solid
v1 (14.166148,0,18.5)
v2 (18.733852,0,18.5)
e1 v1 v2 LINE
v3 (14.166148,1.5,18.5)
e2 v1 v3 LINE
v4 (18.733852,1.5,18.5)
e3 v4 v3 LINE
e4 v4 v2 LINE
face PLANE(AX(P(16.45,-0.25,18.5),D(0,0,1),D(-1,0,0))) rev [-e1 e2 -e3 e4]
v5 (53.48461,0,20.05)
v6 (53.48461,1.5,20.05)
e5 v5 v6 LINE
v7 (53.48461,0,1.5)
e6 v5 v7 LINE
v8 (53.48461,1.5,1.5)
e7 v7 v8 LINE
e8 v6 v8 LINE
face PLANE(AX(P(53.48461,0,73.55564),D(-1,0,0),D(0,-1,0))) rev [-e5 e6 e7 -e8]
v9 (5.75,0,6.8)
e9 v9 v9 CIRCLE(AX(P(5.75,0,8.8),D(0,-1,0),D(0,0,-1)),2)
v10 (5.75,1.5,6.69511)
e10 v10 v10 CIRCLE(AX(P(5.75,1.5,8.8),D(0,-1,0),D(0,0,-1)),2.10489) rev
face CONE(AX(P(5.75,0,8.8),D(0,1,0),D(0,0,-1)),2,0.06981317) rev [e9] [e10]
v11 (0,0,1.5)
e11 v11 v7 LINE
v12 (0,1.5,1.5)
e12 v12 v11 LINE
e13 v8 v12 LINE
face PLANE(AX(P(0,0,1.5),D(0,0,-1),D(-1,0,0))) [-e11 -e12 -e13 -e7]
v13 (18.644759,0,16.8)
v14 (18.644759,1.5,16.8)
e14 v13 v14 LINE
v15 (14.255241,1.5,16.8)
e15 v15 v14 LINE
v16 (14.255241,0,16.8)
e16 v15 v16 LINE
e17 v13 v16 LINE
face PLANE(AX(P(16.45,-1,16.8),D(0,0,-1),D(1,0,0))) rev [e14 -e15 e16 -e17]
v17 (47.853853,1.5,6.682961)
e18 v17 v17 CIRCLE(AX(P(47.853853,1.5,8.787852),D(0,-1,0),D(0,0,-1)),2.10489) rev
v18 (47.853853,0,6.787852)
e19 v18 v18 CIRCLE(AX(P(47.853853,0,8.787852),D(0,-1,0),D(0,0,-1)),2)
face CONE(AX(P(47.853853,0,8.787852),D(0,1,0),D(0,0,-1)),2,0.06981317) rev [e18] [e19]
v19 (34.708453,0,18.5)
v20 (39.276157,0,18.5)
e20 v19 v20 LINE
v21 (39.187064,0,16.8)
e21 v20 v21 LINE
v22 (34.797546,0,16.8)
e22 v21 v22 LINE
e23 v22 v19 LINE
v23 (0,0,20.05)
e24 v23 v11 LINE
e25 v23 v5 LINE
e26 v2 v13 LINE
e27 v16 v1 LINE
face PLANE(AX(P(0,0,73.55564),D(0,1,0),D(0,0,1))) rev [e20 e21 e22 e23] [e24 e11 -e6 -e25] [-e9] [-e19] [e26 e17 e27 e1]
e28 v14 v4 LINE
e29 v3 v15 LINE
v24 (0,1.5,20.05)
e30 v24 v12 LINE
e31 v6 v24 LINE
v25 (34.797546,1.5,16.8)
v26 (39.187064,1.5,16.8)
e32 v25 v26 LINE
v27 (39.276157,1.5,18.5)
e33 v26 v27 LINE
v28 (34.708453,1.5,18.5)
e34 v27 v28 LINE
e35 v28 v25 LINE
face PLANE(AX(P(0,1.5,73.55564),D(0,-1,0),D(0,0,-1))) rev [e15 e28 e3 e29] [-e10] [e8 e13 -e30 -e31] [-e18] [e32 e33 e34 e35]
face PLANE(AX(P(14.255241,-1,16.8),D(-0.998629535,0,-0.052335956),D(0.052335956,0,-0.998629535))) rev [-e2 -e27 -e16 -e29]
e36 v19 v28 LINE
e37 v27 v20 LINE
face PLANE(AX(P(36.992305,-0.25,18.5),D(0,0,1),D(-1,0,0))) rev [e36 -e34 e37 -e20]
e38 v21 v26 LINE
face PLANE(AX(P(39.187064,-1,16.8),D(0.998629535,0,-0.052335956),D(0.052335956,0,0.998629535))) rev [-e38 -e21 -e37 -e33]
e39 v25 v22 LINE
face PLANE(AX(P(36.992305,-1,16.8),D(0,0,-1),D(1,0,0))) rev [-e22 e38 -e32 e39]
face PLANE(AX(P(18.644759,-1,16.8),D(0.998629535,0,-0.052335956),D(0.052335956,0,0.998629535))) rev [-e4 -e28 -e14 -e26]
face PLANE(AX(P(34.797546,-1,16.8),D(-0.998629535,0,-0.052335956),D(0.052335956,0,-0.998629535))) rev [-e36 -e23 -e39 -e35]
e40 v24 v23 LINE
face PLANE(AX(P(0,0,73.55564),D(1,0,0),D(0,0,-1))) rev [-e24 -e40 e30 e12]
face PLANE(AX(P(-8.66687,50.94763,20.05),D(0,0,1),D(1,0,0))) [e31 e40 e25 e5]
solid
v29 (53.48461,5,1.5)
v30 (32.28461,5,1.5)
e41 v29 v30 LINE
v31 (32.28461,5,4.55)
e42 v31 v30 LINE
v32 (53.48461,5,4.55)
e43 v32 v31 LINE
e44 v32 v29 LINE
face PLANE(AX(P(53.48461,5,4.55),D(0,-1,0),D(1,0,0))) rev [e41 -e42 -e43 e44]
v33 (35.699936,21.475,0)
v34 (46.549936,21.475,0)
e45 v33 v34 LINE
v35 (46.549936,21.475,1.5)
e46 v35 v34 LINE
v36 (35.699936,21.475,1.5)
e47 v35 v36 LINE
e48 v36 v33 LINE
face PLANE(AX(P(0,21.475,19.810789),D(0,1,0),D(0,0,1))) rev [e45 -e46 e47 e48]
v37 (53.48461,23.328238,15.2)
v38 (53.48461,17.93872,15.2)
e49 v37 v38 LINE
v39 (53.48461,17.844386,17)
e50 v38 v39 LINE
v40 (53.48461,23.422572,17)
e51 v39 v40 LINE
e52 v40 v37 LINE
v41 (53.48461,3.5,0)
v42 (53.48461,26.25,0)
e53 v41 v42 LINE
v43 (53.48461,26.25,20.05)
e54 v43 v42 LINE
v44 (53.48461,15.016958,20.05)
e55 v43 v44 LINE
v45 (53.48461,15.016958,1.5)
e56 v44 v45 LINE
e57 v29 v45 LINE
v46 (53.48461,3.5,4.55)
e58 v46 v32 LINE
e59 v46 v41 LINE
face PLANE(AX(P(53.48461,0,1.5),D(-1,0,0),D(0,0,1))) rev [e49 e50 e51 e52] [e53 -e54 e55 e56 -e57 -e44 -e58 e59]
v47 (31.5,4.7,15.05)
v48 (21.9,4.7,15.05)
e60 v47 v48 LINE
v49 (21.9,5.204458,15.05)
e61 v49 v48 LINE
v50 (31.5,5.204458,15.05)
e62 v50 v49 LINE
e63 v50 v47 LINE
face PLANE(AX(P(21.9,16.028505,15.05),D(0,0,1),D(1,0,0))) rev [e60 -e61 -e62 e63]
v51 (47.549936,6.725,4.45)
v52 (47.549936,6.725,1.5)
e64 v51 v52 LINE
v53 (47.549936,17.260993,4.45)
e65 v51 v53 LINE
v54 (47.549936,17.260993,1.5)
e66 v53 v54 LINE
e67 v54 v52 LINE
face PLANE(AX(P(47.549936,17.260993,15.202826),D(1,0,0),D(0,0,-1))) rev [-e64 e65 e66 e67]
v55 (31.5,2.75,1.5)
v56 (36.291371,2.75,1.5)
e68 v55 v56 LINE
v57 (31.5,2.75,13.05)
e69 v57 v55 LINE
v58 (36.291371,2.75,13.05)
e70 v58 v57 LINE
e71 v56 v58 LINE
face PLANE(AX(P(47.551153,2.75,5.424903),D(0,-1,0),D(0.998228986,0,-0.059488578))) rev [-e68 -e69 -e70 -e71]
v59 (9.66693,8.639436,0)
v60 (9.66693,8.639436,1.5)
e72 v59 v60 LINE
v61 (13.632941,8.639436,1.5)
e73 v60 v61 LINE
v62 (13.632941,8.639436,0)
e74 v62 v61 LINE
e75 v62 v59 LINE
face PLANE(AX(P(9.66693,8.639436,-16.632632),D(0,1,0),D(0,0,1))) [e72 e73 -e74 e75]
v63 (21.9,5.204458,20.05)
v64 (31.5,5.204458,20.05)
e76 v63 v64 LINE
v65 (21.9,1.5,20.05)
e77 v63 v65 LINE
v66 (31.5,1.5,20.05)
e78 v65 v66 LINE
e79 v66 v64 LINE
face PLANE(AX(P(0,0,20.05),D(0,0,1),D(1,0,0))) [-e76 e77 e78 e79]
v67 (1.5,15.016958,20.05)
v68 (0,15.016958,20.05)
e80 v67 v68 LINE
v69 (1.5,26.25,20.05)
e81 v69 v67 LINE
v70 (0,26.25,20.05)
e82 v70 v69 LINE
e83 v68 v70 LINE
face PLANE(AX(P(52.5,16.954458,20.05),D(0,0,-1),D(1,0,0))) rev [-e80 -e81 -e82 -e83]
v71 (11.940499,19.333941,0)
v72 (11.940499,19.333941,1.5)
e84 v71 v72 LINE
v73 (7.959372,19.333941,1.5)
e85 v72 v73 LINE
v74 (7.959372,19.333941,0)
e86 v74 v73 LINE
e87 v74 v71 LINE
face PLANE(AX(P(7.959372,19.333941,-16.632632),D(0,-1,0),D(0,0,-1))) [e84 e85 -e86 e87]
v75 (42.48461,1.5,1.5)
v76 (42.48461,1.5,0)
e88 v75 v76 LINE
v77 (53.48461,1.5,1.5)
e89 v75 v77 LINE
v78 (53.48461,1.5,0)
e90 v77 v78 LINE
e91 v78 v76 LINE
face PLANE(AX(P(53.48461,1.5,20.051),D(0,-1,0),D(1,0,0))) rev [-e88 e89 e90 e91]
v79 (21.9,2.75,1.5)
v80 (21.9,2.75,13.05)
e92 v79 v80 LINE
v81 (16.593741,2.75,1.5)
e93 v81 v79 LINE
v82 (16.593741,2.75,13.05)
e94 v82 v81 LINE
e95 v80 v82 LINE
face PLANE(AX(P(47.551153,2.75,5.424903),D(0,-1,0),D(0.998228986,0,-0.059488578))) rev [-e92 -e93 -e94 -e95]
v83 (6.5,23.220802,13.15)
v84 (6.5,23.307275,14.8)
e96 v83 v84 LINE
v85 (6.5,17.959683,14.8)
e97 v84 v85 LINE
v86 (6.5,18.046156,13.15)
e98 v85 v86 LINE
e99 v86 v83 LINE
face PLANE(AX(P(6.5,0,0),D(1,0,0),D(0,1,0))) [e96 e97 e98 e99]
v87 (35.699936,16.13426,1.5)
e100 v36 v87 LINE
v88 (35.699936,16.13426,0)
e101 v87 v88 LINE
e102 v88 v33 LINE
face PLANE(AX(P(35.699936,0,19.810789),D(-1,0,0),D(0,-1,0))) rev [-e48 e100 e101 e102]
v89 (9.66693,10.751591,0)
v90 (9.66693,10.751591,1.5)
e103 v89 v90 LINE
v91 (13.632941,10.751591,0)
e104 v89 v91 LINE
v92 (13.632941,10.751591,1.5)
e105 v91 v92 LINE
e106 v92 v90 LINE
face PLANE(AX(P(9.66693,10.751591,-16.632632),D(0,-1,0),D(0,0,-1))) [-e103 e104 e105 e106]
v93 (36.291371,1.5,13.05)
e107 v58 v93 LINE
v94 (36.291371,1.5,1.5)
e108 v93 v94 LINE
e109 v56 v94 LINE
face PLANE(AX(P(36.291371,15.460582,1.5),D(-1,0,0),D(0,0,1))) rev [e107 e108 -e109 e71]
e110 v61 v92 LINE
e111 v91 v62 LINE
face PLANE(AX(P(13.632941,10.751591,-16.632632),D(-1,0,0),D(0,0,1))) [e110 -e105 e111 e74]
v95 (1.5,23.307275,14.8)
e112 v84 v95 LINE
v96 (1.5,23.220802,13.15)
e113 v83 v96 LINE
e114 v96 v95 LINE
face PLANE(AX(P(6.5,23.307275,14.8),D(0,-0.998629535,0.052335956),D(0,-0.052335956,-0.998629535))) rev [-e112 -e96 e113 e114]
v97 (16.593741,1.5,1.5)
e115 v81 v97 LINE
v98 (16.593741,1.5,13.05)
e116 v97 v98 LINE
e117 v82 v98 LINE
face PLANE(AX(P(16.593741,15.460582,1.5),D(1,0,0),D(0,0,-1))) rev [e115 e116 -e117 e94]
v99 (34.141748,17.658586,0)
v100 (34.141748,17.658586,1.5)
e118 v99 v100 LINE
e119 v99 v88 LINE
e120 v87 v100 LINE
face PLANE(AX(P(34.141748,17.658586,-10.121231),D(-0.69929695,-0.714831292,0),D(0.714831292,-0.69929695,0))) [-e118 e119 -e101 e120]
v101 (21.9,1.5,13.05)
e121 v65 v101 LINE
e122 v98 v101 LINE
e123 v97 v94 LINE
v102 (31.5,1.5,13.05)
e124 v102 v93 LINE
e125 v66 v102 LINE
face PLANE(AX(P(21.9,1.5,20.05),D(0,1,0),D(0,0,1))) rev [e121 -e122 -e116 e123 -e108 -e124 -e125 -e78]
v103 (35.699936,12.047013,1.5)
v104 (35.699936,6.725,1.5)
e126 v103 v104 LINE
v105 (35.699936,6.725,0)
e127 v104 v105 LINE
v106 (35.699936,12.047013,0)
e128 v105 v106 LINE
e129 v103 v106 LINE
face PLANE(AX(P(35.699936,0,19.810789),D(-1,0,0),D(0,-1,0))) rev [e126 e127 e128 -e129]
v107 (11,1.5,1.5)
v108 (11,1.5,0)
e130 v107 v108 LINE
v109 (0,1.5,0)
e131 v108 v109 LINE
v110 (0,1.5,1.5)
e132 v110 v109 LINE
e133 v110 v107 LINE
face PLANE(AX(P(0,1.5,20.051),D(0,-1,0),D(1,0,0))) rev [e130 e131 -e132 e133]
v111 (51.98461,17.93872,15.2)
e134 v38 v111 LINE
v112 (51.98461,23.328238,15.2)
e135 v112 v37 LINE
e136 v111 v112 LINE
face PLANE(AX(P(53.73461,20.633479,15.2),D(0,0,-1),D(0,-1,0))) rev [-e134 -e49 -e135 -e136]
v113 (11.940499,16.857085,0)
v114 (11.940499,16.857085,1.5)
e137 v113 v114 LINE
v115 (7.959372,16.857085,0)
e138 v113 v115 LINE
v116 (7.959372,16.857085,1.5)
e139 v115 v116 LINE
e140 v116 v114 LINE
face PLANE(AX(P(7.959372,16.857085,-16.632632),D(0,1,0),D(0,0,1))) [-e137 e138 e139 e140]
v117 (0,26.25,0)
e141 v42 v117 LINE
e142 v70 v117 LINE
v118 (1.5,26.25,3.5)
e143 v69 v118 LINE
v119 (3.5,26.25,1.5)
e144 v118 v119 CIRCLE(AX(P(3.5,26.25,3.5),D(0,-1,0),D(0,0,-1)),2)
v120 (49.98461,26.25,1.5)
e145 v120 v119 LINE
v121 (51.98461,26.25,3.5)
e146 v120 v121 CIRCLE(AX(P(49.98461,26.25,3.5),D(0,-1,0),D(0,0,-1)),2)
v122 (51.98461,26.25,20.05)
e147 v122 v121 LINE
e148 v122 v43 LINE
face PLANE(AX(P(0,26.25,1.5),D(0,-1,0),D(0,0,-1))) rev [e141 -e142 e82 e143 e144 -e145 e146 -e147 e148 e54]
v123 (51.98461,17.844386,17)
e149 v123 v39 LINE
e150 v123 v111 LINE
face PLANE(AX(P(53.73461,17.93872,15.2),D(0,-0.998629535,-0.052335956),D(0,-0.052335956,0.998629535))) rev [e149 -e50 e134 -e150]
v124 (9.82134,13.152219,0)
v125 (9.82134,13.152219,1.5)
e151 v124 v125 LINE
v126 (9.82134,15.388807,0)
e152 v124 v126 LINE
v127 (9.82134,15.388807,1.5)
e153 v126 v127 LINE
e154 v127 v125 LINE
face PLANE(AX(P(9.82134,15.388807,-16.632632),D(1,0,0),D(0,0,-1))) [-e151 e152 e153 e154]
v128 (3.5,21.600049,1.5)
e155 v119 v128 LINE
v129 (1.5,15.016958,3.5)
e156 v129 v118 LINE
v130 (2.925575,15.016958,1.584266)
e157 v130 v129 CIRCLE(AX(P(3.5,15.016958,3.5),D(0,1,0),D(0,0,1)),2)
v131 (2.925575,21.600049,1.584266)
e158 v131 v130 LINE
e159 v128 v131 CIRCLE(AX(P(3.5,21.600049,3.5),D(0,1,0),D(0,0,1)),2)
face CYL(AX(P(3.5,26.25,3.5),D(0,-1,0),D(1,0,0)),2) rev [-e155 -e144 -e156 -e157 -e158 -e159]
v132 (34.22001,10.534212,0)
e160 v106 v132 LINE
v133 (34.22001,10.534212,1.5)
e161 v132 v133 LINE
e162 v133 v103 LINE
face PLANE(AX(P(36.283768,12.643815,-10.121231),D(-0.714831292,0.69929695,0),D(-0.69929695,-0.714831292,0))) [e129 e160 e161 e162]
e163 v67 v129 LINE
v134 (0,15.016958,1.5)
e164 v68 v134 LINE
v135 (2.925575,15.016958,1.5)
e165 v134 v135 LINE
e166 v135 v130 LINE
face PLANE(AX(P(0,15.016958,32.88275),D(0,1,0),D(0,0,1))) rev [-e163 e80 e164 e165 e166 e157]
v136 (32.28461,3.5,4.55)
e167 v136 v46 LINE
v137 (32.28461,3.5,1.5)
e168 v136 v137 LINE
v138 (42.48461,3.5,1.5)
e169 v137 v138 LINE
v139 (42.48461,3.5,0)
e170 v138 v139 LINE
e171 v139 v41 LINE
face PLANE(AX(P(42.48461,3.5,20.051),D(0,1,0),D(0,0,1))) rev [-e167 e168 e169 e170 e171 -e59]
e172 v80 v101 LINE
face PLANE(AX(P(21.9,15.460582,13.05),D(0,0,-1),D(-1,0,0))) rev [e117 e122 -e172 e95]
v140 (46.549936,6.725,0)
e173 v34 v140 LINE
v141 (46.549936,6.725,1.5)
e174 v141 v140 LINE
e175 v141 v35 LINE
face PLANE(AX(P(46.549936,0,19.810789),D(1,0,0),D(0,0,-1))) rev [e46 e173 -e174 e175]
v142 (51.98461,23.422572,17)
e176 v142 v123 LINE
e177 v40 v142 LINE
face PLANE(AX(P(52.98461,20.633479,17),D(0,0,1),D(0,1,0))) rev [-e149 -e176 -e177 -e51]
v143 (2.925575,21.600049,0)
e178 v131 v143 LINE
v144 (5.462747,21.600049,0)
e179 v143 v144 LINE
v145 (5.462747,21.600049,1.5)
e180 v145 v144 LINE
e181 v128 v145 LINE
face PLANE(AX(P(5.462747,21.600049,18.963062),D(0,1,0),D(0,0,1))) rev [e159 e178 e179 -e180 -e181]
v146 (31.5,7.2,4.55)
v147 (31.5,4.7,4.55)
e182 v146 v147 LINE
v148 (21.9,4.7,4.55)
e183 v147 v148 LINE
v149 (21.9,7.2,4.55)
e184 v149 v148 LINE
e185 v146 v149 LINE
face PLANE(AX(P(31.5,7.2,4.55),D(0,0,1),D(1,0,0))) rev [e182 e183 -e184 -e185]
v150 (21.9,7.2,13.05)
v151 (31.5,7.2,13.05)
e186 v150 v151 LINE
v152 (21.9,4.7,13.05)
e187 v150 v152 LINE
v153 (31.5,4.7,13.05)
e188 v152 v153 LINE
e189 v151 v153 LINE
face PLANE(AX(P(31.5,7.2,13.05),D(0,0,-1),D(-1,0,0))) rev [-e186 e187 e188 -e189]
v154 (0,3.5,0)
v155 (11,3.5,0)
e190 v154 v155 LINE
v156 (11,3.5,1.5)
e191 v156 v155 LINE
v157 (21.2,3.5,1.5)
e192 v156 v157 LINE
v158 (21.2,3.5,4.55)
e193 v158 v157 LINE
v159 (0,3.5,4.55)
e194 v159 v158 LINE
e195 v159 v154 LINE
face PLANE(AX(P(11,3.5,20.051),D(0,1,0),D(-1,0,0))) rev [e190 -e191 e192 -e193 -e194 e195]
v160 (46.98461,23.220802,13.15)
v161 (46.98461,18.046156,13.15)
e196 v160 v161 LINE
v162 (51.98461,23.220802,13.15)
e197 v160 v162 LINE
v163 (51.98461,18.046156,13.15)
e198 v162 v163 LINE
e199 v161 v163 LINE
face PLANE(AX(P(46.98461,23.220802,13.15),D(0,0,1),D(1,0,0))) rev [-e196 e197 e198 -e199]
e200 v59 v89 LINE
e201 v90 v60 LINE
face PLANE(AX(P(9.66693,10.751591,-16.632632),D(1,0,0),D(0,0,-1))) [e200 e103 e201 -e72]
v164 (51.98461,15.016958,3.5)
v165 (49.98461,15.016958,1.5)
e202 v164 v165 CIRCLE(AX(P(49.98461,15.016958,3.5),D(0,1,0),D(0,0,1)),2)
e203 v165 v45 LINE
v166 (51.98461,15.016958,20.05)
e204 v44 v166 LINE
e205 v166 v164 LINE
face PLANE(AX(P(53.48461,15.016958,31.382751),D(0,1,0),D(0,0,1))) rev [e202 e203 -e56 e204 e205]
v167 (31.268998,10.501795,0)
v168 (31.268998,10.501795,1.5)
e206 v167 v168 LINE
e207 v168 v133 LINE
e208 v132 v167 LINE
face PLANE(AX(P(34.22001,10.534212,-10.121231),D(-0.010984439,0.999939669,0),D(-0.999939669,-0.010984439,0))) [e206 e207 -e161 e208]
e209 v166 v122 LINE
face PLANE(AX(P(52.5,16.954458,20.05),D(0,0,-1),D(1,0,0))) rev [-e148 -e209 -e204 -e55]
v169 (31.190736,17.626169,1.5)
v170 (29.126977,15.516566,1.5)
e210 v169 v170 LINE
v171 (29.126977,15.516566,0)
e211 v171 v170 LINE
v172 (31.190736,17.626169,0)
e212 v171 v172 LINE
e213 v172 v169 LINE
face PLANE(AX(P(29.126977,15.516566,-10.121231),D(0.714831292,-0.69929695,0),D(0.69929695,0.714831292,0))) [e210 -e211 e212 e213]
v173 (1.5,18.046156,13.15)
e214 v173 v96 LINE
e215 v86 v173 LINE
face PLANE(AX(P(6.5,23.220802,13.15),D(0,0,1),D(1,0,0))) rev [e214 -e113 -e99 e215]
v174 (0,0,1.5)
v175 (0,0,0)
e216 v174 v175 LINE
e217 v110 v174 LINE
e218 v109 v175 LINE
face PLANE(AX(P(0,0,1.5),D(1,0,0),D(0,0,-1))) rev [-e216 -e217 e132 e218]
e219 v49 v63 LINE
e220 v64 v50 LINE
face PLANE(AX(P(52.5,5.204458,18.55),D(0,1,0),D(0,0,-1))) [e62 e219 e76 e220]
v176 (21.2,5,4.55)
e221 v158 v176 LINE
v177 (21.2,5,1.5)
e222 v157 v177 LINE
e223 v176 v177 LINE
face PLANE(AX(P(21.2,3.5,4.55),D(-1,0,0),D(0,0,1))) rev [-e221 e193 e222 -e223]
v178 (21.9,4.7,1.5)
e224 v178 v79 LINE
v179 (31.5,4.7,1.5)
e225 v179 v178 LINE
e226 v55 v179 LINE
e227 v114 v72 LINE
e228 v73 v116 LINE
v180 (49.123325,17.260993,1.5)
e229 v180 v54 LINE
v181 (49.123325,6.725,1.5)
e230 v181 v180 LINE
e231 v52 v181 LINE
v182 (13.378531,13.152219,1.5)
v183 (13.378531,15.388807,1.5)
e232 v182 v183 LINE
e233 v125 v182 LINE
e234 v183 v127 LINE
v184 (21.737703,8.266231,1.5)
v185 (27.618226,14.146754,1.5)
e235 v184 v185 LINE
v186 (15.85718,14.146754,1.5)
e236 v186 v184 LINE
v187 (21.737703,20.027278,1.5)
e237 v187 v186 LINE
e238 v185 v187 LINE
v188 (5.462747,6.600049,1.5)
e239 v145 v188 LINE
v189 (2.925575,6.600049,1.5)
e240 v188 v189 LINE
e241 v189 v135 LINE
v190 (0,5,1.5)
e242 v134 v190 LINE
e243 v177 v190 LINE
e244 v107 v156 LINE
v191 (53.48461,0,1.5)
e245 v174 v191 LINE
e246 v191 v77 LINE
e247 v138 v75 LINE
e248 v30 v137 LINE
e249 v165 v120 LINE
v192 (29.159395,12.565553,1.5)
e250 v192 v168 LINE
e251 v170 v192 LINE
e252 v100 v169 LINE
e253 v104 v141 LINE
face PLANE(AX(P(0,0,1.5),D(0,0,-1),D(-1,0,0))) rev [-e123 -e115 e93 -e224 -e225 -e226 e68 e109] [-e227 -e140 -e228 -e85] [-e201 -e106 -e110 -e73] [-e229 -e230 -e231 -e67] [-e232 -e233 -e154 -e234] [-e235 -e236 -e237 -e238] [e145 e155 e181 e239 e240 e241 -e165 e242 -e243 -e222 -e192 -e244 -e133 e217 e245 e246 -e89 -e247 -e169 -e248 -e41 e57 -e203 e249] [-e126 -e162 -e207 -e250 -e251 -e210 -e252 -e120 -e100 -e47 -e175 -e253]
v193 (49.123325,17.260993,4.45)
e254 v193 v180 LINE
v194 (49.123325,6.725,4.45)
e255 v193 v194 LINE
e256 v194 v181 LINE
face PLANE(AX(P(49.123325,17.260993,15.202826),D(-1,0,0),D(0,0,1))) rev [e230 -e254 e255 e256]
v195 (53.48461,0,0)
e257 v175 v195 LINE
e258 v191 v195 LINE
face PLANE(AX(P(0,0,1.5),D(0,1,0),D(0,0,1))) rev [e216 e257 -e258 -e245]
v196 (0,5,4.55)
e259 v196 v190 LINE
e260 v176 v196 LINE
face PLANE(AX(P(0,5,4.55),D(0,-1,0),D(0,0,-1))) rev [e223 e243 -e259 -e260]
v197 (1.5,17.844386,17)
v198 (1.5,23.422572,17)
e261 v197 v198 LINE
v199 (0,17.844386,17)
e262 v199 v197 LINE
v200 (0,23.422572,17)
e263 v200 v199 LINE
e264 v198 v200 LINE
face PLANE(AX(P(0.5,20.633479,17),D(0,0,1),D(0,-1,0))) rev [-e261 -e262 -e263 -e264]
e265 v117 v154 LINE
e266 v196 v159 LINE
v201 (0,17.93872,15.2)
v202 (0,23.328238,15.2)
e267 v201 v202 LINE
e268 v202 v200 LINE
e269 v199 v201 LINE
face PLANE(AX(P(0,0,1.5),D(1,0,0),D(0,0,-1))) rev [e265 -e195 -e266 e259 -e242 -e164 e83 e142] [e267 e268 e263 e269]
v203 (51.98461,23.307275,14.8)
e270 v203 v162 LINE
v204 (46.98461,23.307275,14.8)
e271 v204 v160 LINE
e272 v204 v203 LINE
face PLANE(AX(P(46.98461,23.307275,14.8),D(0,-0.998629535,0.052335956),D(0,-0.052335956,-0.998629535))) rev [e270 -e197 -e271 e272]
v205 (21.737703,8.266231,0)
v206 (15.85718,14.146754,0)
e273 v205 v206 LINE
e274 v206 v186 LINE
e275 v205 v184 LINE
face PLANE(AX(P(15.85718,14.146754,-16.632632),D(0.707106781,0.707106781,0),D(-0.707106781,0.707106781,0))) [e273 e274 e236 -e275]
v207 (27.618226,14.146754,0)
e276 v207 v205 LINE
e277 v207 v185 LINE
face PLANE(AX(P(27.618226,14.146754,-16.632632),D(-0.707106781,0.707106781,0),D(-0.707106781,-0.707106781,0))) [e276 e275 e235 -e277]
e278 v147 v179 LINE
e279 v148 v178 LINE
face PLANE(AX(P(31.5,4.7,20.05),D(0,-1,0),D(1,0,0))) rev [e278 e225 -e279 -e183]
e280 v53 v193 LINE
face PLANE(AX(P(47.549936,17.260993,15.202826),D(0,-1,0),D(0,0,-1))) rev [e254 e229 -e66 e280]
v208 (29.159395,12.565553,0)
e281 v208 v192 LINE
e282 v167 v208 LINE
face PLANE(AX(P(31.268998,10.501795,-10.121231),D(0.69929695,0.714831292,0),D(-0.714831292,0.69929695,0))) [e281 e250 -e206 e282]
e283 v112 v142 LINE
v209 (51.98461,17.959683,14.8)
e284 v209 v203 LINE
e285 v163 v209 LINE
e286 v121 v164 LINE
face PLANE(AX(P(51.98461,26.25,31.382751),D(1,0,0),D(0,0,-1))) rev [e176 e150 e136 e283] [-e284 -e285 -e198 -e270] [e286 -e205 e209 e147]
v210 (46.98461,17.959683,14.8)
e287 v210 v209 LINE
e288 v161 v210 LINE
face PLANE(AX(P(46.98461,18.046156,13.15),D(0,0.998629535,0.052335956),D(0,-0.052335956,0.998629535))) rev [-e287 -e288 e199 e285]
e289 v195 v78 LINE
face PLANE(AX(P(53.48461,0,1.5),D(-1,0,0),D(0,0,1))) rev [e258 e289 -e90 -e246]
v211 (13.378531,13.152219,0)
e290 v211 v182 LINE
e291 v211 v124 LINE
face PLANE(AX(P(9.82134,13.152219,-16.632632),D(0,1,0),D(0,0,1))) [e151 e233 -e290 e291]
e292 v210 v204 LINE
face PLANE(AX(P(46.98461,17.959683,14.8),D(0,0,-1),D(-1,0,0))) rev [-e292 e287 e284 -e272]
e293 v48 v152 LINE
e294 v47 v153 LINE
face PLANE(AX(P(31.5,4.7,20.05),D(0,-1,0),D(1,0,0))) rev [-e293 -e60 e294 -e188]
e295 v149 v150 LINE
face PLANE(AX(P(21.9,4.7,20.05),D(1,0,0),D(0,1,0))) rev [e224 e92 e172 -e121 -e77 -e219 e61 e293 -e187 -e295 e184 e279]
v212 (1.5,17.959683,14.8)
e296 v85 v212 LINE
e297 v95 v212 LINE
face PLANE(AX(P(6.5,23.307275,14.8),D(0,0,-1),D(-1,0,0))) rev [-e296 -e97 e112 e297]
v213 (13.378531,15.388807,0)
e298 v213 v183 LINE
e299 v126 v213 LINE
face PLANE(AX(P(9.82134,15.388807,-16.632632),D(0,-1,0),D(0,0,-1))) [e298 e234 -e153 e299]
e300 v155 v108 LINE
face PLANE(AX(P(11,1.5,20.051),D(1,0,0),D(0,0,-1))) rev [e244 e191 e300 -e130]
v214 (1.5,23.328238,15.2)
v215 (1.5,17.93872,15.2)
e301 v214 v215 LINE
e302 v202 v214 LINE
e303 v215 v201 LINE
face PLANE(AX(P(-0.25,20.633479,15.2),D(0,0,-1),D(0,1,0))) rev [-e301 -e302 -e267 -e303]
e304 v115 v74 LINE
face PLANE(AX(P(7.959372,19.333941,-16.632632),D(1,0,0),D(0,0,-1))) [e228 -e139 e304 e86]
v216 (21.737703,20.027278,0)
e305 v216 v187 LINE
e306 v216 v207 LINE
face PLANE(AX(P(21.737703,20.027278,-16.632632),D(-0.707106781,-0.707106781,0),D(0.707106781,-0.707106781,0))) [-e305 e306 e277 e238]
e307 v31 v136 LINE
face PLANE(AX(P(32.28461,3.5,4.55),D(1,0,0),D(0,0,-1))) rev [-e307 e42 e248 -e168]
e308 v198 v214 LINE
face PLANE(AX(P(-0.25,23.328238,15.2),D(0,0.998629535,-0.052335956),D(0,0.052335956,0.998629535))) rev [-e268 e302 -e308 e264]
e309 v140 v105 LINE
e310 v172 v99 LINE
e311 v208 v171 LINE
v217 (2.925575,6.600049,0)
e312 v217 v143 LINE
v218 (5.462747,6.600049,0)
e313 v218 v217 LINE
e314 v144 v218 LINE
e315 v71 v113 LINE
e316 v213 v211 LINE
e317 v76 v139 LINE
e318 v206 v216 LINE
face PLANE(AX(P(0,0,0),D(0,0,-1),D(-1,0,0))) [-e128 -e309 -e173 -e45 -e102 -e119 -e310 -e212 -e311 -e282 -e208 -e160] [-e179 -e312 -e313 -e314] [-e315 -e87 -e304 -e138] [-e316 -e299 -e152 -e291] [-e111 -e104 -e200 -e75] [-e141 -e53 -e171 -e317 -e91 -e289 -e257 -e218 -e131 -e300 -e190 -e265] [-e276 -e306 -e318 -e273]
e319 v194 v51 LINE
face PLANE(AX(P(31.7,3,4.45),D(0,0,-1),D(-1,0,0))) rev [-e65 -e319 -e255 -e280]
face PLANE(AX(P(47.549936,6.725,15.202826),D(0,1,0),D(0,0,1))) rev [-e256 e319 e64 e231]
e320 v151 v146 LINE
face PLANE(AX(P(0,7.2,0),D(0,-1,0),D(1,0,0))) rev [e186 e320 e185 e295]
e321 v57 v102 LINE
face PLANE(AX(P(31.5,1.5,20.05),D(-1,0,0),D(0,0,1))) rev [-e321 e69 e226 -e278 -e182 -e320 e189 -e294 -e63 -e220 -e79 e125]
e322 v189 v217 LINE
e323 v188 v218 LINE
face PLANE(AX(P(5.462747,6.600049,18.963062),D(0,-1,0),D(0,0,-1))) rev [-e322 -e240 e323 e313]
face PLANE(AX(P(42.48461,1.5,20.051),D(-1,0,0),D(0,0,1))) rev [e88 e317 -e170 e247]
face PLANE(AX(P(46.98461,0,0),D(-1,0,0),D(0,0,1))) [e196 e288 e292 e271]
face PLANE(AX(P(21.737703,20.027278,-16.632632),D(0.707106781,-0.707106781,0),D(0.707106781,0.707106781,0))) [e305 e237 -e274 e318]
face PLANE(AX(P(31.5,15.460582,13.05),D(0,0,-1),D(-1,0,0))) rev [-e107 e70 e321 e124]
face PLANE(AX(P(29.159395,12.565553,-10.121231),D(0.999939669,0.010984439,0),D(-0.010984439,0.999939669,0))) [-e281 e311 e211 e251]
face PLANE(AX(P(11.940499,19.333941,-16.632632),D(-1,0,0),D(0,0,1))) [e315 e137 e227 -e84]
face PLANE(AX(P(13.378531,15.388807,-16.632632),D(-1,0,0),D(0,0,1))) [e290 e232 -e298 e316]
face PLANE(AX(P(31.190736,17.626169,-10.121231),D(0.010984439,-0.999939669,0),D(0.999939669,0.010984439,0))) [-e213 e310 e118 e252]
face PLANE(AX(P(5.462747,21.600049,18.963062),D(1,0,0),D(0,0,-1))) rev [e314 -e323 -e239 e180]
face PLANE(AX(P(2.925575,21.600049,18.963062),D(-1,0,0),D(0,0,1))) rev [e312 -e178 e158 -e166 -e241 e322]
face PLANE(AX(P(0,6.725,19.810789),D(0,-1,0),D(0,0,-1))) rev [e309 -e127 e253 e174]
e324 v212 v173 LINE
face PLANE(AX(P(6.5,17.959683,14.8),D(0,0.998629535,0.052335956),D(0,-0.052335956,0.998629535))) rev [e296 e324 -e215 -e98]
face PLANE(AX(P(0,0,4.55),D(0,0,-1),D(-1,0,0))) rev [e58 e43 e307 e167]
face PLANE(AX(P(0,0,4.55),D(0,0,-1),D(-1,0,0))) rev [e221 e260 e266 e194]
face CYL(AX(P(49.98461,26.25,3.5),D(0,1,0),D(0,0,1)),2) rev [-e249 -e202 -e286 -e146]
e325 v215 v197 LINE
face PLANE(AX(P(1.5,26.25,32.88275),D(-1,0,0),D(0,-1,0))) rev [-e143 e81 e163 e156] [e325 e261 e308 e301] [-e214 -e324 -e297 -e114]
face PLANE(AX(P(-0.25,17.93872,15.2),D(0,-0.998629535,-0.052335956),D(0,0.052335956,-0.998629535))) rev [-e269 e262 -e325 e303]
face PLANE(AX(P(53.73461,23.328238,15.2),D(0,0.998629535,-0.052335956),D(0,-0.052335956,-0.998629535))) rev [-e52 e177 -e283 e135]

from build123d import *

# Parameters (mm, degrees)
SKETCH1_W                              = 53.48460998
SKETCH1_H                              = 26.25
FRONT_SIDE_MAIN_DEPTH                  = 1.5
RESET_HOLE_DEPTH                       = 3.75
SKETCH15_W                             = 3.966010581
SKETCH15_H                             = 2.112155191
SKETCH15_W_2                           = 3.557190409
SKETCH15_H_2                           = 2.236587576
SKETCH15_W_3                           = 3.981127105
SKETCH15_H_3                           = 2.476855865
COMPONENT_HOLES_DEPTH                  = 3.75
SKETCH16_W                             = 10.85
SKETCH16_H                             = 14.75
MICROPHONE_HOLE_DEPTH                  = 1.5
SKETCH24_W                             = 1.5
SKETCH24_H                             = 11.233042059
RIGHT_SIDE_TOP_DEPTH                   = 18.55
SNAP_GROOVE_RIGHT_DEPTH                = 1.5
SKETCH26_W                             = 1.5
SKETCH26_H                             = 11.233042059
LEFT_SIDE_TOP_DEPTH                    = 18.55
SNAP_START                             = 51.98460998
SNAP_GROOVE_LEFT_DEPTH                 = 1.5
SKETCH20_W                             = 53.48460998
SKETCH20_H                             = 1.5
BOTTOM_BASE_DEPTH                      = 18.55
SERVO_START                            = -1.5
SKETCH18_W                             = 9.6
SKETCH18_H                             = 3.2
SERVO_SEPERATOR_BOTTOM_DEPTH           = 20.05
SKETCH34_W                             = 2.537171882
SKETCH34_H                             = 15
PROGRAMMING_HOLE_DEPTH                 = 3.75
SKETCH38_W                             = 9.6
SKETCH38_H                             = 5
BACK_BATTERY_HOLDER_BOTTOM_DEPTH       = 0.504457941
SKETCH40_R                             = 2
SERVO_ARM_HOLES_BOTTOM_DEPTH           = 1.5
SERVO_ARM_HOLES_BOTTOM_DRAFT           = 4
SERVO_ARM_HOLES_BOTTOM_PROFILE_2_DEPTH = 1.5
SERVO_ARM_HOLES_BOTTOM_PROFILE_2_DRAFT = 4
SKETCH47_W                             = 11
SKETCH47_H                             = 2
SOLAR_ARM_HOLES_FRONT_DEPTH            = 1.5
FILLET1_R                              = 2
SKETCH48_W                             = 9.6
SKETCH48_H                             = 8.5
SERVO_TALLER_SEPERATOR_BOTTOM_DEPTH    = 2.5
SKETCH49_W                             = 1.573389805
SKETCH49_H                             = 10.535992885
SERVO_2_CASE_SPACER_FRONT_DEPTH        = 2.95
SKETCH51_W                             = 4.791370676
SKETCH51_H                             = 11.55
SKETCH51_W_2                           = 5.306259021
SERVO_LIFTERS_BOTTOM_DEPTH             = 1.25
SKETCH52_W                             = 21.2
SKETCH52_H                             = 1.5
SERVO_UNDER_SUPPORT_DEPTH              = 3.05
SERVO_TOP_SUPPORT_RIGHT_DEPTH          = 5
SERVO_TOP_SUPPORT_LEFT_DEPTH           = 5
SNAP_GROOVE_BOTTOM_RIGHT_DEPTH         = 1.5
SNAP_GROOVE_BOTTOM_LEFT_DEPTH          = 1.5


# Read off the part's stored shape, not the designer's step: Snap Groove - Right, Snap Groove - Left, Snap Groove - Bottom Right, Snap Groove - Bottom Left
with BuildPart() as part:
    # Sketch1 → Front Side - Main (new body)
    with BuildSketch(Plane.XY):
        with Locations((26.74230499, 13.125)):
            Rectangle(SKETCH1_W, SKETCH1_H)
    extrude(amount=FRONT_SIDE_MAIN_DEPTH)

    # Reset Hole Sketch → Reset Hole (cut)
    with BuildSketch(Plane(origin=(0, 0, 3.75), x_dir=(-1, 0, 0), z_dir=(0, 0, -1))):
        Polygon((-31.190735744, 17.626168756), (-34.141748042, 17.658585925), (-36.251351249, 15.594827519), (-36.283768419, 12.643815222), (-34.220010013, 10.534212015), (-31.268997715, 10.501794845), (-29.159394508, 12.565553251), (-29.126977338, 15.516565548), align=None)
    extrude(amount=RESET_HOLE_DEPTH, mode=Mode.SUBTRACT)

    # Sketch15 → Component Holes (cut)
    with BuildSketch(Plane(origin=(0, 0, 3.75), x_dir=(-1, 0, 0), z_dir=(0, 0, -1))):
        Polygon((-21.737702993, 20.027277789), (-15.857179586, 14.146754382), (-21.737702993, 8.266230975), (-27.6182264, 14.146754382), align=None)
        with Locations((-11.649935563, 9.695513201)):
            Rectangle(SKETCH15_W, SKETCH15_H)
        with Locations((-11.599935563, 14.270513201)):
            Rectangle(SKETCH15_W_2, SKETCH15_H_2)
        with Locations((-9.949935563, 18.095513201)):
            Rectangle(SKETCH15_W_3, SKETCH15_H_3)
    extrude(amount=COMPONENT_HOLES_DEPTH, mode=Mode.SUBTRACT)

    # Sketch16 → Microphone Hole (cut)
    with BuildSketch(Plane(origin=(0, 0, 0), x_dir=(-1, 0, 0), z_dir=(0, 0, -1))):
        with Locations((-41.124935562, 14.1)):
            Rectangle(SKETCH16_W, SKETCH16_H)
    extrude(amount=-MICROPHONE_HOLE_DEPTH, mode=Mode.SUBTRACT)

    # Sketch24 → Right Side - Top (add)
    with BuildSketch(Plane.XY.offset(1.5)):
        with Locations((0.75, 20.633478971)):
            Rectangle(SKETCH24_W, SKETCH24_H)
    extrude(amount=RIGHT_SIDE_TOP_DEPTH)

    # Snap Groove - Right outline → Snap Groove - Right (cut)
    with BuildSketch(Plane.YZ):
        Polygon((17.938719749, 15.2), (23.328238193, 15.2), (23.422572195, 17), (17.844385746, 17), align=None)
    extrude(amount=SNAP_GROOVE_RIGHT_DEPTH, mode=Mode.SUBTRACT)

    # Sketch26 → Left Side - Top (add)
    with BuildSketch(Plane.XY.offset(1.5)):
        with Locations((52.73460998, 20.633478971)):
            Rectangle(SKETCH26_W, SKETCH26_H)
    extrude(amount=LEFT_SIDE_TOP_DEPTH)

    # Snap Groove - Left outline → Snap Groove - Left (cut)
    with BuildSketch(Plane.YZ.offset(SNAP_START)):
        Polygon((17.938719748, 15.2), (23.328238192, 15.2), (23.422572195, 17), (17.844385746, 17), align=None)
    extrude(amount=SNAP_GROOVE_LEFT_DEPTH, mode=Mode.SUBTRACT)

    # Sketch18 → Servo Seperator - Bottom (add)
    with BuildSketch(Plane.XY.offset(1.5).offset(SERVO_START)):
        with Locations((26.7, 3.1)):
            Rectangle(SKETCH18_W, SKETCH18_H)
    extrude(amount=SERVO_SEPERATOR_BOTTOM_DEPTH)

    # Sketch34 → Programming Hole (cut)
    with BuildSketch(Plane(origin=(0, 0, 0), x_dir=(-1, 0, 0), z_dir=(0, 0, -1))):
        with Locations((-4.194161079, 14.100049249)):
            Rectangle(SKETCH34_W, SKETCH34_H)
    extrude(amount=-PROGRAMMING_HOLE_DEPTH, mode=Mode.SUBTRACT)

    # Sketch38 → Back Battery Holder - Bottom (add)
    with BuildSketch(Plane(origin=(0, 4.7, 0), x_dir=(1, 0, 0), z_dir=(0, 1, 0))):
        with Locations((26.7, -17.55)):
            Rectangle(SKETCH38_W, SKETCH38_H)
    extrude(amount=BACK_BATTERY_HOLDER_BOTTOM_DEPTH)

    # Sketch47 → Solar Arm Holes - Front (cut)
    with BuildSketch(Plane(origin=(0, 0, 0), x_dir=(-1, 0, 0), z_dir=(0, 0, -1))):
        with Locations((-47.98460998, 2.5)):
            Rectangle(SKETCH47_W, SKETCH47_H)
        with Locations((-5.5, 2.5)):
            Rectangle(SKETCH47_W, SKETCH47_H)
    extrude(amount=-SOLAR_ARM_HOLES_FRONT_DEPTH, mode=Mode.SUBTRACT)

    # Fillet1
    # the kernel refuses this fillet: 2 mm, written as the material it adds along each edge
    with BuildSketch(Plane(origin=(1.5, 26.25, 1.5), x_dir=(1, 0, 0), z_dir=(0, -1, 0))) as fillet1_piece_1_section:
        with BuildLine():
            CenterArc((FILLET1_R, FILLET1_R), FILLET1_R, 180, 90)
            Line((0, FILLET1_R), (0, 0))
            Line((0, 0), (FILLET1_R, 0))
        make_face()
    fillet1_piece_1 = extrude(amount=11.233042059, mode=Mode.PRIVATE)
    fillet1_piece_1 = split(fillet1_piece_1, bisect_by=Plane(origin=(3.153594052, 21.600049249, 1.498546269), z_dir=(0, 1, 0)), keep=Keep.TOP, mode=Mode.PRIVATE)
    fillet1_piece_1 = split(fillet1_piece_1, bisect_by=Plane(origin=(2.925575138, 23.925024625, 1.498546269), z_dir=(1, 0, 0)), keep=Keep.TOP, mode=Mode.PRIVATE)
    add(fillet1_piece_1)
    with BuildSketch(Plane(origin=(1.5, 26.25, 1.5), x_dir=(1, 0, 0), z_dir=(0, -1, 0))) as fillet1_piece_2_section:
        with BuildLine():
            CenterArc((FILLET1_R, FILLET1_R), FILLET1_R, 180, 90)
            Line((0, FILLET1_R), (0, 0))
            Line((0, 0), (FILLET1_R, 0))
        make_face()
    fillet1_piece_2 = extrude(amount=11.233042059, mode=Mode.PRIVATE)
    fillet1_piece_2 = split(fillet1_piece_2, bisect_by=Plane(origin=(1.90508607, 21.600049249, 1.970835912), z_dir=(0, 1, 0)), keep=Keep.TOP, mode=Mode.PRIVATE)
    fillet1_piece_2 = split(fillet1_piece_2, bisect_by=Plane(origin=(2.925575138, 23.925024625, 1.970835912), z_dir=(-1, 0, 0)), keep=Keep.TOP, mode=Mode.PRIVATE)
    add(fillet1_piece_2)
    with BuildSketch(Plane(origin=(1.5, 26.25, 1.5), x_dir=(1, 0, 0), z_dir=(0, -1, 0))) as fillet1_piece_3_section:
        with BuildLine():
            CenterArc((FILLET1_R, FILLET1_R), FILLET1_R, 180, 90)
            Line((0, FILLET1_R), (0, 0))
            Line((0, 0), (FILLET1_R, 0))
        make_face()
    fillet1_piece_3 = extrude(amount=11.233042059, mode=Mode.PRIVATE)
    fillet1_piece_3 = split(fillet1_piece_3, bisect_by=Plane(origin=(1.90508607, 21.600049249, 1.970835912), z_dir=(0, -1, 0)), keep=Keep.TOP, mode=Mode.PRIVATE)
    fillet1_piece_3 = split(fillet1_piece_3, bisect_by=Plane(origin=(2.925575138, 18.308503595, 1.970835912), z_dir=(-1, 0, 0)), keep=Keep.TOP, mode=Mode.PRIVATE)
    add(fillet1_piece_3)
    with BuildSketch(Plane(origin=(51.98460998, 26.25, 1.5), x_dir=(-1, 0, 0), z_dir=(0, -1, 0))) as fillet1_piece_4:
        with BuildLine():
            CenterArc((FILLET1_R, -FILLET1_R), FILLET1_R, 90, 90)
            Line((0, -FILLET1_R), (0, 0))
            Line((0, 0), (FILLET1_R, 0))
        make_face()
    extrude(amount=11.233042059)

    # Sketch48 → Servo Taller Seperator - Bottom (add)
    with BuildSketch(Plane(origin=(0, 4.7, 0), x_dir=(1, 0, 0), z_dir=(0, 1, 0))):
        with Locations((26.7, -8.8)):
            Rectangle(SKETCH48_W, SKETCH48_H)
    extrude(amount=SERVO_TALLER_SEPERATOR_BOTTOM_DEPTH)

    # Sketch49 → Servo 2 Case Spacer - Front (add)
    with BuildSketch(Plane.XY.offset(1.5)):
        with Locations((48.336630465, 11.992996443)):
            Rectangle(SKETCH49_W, SKETCH49_H)
    extrude(amount=SERVO_2_CASE_SPACER_FRONT_DEPTH)

    # Sketch51 → Servo Lifters - Bottom (add)
    with BuildSketch(Plane(origin=(0, 1.5, 0), x_dir=(1, 0, 0), z_dir=(0, 1, 0))):
        with Locations((33.895685338, -7.275)):
            Rectangle(SKETCH51_W, SKETCH51_H)
        with Locations((19.24687049, -7.275)):
            Rectangle(SKETCH51_W_2, SKETCH51_H)
    extrude(amount=SERVO_LIFTERS_BOTTOM_DEPTH)

    # Sketch52 → Servo Under Support (add)
    with BuildSketch(Plane.XY.offset(1.5)):
        with Locations((10.6, 4.25)):
            Rectangle(SKETCH52_W, SKETCH52_H)
        with Locations((42.88460998, 4.25)):
            Rectangle(SKETCH52_W, SKETCH52_H)
    extrude(amount=SERVO_UNDER_SUPPORT_DEPTH)

    # Sketch53 → Servo Top Support - Right (add)
    with BuildSketch(Plane(origin=(1.5, 0, 0), x_dir=(0, 0, -1), z_dir=(1, 0, 0))):
        Polygon((-14.8, 23.307275081), (-13.15, 23.220802245), (-13.15, 18.046155696), (-14.8, 17.95968286), align=None)
    extrude(amount=SERVO_TOP_SUPPORT_RIGHT_DEPTH)

    # Sketch55 → Servo Top Support - Left (add)
    with BuildSketch(Plane.ZY.offset(-51.98460998)):
        Polygon((14.8, 17.95968286), (14.8, 23.307275081), (13.15, 23.220802245), (13.15, 18.046155696), align=None)
    extrude(amount=SERVO_TOP_SUPPORT_LEFT_DEPTH)


with BuildPart() as body_2:
    # Sketch20 → Bottom Base (new body)
    with BuildSketch(Plane.XY.offset(1.5)):
        with Locations((26.74230499, 0.75)):
            Rectangle(SKETCH20_W, SKETCH20_H)
    extrude(amount=BOTTOM_BASE_DEPTH)


with BuildPart() as servo_arm_holes_bottom_tool:
    # Sketch40 → Servo arm Holes - Bottom (with draft: the straight prism first)
    with BuildSketch(Plane.XZ):
        with Locations((47.853853261, 8.787851544)):
            Circle(SKETCH40_R)
    extrude(amount=-SERVO_ARM_HOLES_BOTTOM_DEPTH)
    # Servo arm Holes - Bottom: the draft: its side faces are tilted about the plane it starts from
    servo_arm_holes_bottom_sides = [servo_arm_holes_bottom_tool.faces().sort_by_distance(p)[0] for p in [
        (45.853853261, 0.75, 8.787851544),
    ]]
    draft(servo_arm_holes_bottom_sides, Plane.XZ, SERVO_ARM_HOLES_BOTTOM_DRAFT)


with BuildPart() as body_2_1:
    add(body_2.part)

    # Servo arm Holes - Bottom: cut by servo_arm_holes_bottom_tool
    add(servo_arm_holes_bottom_tool.part, mode=Mode.SUBTRACT)


with BuildPart() as servo_arm_holes_bottom_profile_2_tool:
    # Sketch40 → Servo arm Holes - Bottom profile 2 (with draft: the straight prism first)
    with BuildSketch(Plane.XZ):
        with Locations((5.75, 8.8)):
            Circle(SKETCH40_R)
    extrude(amount=-SERVO_ARM_HOLES_BOTTOM_PROFILE_2_DEPTH)
    # Servo arm Holes - Bottom profile 2: the draft: its side faces are tilted about the plane it starts from
    servo_arm_holes_bottom_profile_2_sides = [servo_arm_holes_bottom_profile_2_tool.faces().sort_by_distance(p)[0] for p in [
        (3.75, 0.75, 8.8),
    ]]
    draft(servo_arm_holes_bottom_profile_2_sides, Plane.XZ, SERVO_ARM_HOLES_BOTTOM_PROFILE_2_DRAFT)


with BuildPart() as body_2_2:
    add(body_2_1.part)

    # Servo arm Holes - Bottom profile 2: cut by servo_arm_holes_bottom_profile_2_tool
    add(servo_arm_holes_bottom_profile_2_tool.part, mode=Mode.SUBTRACT)

    # Snap Groove - Bottom Right outline → Snap Groove - Bottom Right (cut)
    with BuildSketch(Plane(origin=(0, 0, 0), x_dir=(1, 0, 0), z_dir=(0, 1, 0))):
        Polygon((14.166147553, -18.5), (18.733852447, -18.5), (18.644759222, -16.8), (14.255240778, -16.8), align=None)
    extrude(amount=SNAP_GROOVE_BOTTOM_RIGHT_DEPTH, mode=Mode.SUBTRACT)

    # Snap Groove - Bottom Left outline → Snap Groove - Bottom Left (cut)
    with BuildSketch(Plane(origin=(0, 0, 0), x_dir=(1, 0, 0), z_dir=(0, 1, 0))):
        Polygon((39.276157437, -18.5), (39.187064212, -16.8), (34.797545768, -16.8), (34.708452543, -18.5), align=None)
    extrude(amount=SNAP_GROOVE_BOTTOM_LEFT_DEPTH, mode=Mode.SUBTRACT)


solid = Compound([part.part, body_2_2.part])
